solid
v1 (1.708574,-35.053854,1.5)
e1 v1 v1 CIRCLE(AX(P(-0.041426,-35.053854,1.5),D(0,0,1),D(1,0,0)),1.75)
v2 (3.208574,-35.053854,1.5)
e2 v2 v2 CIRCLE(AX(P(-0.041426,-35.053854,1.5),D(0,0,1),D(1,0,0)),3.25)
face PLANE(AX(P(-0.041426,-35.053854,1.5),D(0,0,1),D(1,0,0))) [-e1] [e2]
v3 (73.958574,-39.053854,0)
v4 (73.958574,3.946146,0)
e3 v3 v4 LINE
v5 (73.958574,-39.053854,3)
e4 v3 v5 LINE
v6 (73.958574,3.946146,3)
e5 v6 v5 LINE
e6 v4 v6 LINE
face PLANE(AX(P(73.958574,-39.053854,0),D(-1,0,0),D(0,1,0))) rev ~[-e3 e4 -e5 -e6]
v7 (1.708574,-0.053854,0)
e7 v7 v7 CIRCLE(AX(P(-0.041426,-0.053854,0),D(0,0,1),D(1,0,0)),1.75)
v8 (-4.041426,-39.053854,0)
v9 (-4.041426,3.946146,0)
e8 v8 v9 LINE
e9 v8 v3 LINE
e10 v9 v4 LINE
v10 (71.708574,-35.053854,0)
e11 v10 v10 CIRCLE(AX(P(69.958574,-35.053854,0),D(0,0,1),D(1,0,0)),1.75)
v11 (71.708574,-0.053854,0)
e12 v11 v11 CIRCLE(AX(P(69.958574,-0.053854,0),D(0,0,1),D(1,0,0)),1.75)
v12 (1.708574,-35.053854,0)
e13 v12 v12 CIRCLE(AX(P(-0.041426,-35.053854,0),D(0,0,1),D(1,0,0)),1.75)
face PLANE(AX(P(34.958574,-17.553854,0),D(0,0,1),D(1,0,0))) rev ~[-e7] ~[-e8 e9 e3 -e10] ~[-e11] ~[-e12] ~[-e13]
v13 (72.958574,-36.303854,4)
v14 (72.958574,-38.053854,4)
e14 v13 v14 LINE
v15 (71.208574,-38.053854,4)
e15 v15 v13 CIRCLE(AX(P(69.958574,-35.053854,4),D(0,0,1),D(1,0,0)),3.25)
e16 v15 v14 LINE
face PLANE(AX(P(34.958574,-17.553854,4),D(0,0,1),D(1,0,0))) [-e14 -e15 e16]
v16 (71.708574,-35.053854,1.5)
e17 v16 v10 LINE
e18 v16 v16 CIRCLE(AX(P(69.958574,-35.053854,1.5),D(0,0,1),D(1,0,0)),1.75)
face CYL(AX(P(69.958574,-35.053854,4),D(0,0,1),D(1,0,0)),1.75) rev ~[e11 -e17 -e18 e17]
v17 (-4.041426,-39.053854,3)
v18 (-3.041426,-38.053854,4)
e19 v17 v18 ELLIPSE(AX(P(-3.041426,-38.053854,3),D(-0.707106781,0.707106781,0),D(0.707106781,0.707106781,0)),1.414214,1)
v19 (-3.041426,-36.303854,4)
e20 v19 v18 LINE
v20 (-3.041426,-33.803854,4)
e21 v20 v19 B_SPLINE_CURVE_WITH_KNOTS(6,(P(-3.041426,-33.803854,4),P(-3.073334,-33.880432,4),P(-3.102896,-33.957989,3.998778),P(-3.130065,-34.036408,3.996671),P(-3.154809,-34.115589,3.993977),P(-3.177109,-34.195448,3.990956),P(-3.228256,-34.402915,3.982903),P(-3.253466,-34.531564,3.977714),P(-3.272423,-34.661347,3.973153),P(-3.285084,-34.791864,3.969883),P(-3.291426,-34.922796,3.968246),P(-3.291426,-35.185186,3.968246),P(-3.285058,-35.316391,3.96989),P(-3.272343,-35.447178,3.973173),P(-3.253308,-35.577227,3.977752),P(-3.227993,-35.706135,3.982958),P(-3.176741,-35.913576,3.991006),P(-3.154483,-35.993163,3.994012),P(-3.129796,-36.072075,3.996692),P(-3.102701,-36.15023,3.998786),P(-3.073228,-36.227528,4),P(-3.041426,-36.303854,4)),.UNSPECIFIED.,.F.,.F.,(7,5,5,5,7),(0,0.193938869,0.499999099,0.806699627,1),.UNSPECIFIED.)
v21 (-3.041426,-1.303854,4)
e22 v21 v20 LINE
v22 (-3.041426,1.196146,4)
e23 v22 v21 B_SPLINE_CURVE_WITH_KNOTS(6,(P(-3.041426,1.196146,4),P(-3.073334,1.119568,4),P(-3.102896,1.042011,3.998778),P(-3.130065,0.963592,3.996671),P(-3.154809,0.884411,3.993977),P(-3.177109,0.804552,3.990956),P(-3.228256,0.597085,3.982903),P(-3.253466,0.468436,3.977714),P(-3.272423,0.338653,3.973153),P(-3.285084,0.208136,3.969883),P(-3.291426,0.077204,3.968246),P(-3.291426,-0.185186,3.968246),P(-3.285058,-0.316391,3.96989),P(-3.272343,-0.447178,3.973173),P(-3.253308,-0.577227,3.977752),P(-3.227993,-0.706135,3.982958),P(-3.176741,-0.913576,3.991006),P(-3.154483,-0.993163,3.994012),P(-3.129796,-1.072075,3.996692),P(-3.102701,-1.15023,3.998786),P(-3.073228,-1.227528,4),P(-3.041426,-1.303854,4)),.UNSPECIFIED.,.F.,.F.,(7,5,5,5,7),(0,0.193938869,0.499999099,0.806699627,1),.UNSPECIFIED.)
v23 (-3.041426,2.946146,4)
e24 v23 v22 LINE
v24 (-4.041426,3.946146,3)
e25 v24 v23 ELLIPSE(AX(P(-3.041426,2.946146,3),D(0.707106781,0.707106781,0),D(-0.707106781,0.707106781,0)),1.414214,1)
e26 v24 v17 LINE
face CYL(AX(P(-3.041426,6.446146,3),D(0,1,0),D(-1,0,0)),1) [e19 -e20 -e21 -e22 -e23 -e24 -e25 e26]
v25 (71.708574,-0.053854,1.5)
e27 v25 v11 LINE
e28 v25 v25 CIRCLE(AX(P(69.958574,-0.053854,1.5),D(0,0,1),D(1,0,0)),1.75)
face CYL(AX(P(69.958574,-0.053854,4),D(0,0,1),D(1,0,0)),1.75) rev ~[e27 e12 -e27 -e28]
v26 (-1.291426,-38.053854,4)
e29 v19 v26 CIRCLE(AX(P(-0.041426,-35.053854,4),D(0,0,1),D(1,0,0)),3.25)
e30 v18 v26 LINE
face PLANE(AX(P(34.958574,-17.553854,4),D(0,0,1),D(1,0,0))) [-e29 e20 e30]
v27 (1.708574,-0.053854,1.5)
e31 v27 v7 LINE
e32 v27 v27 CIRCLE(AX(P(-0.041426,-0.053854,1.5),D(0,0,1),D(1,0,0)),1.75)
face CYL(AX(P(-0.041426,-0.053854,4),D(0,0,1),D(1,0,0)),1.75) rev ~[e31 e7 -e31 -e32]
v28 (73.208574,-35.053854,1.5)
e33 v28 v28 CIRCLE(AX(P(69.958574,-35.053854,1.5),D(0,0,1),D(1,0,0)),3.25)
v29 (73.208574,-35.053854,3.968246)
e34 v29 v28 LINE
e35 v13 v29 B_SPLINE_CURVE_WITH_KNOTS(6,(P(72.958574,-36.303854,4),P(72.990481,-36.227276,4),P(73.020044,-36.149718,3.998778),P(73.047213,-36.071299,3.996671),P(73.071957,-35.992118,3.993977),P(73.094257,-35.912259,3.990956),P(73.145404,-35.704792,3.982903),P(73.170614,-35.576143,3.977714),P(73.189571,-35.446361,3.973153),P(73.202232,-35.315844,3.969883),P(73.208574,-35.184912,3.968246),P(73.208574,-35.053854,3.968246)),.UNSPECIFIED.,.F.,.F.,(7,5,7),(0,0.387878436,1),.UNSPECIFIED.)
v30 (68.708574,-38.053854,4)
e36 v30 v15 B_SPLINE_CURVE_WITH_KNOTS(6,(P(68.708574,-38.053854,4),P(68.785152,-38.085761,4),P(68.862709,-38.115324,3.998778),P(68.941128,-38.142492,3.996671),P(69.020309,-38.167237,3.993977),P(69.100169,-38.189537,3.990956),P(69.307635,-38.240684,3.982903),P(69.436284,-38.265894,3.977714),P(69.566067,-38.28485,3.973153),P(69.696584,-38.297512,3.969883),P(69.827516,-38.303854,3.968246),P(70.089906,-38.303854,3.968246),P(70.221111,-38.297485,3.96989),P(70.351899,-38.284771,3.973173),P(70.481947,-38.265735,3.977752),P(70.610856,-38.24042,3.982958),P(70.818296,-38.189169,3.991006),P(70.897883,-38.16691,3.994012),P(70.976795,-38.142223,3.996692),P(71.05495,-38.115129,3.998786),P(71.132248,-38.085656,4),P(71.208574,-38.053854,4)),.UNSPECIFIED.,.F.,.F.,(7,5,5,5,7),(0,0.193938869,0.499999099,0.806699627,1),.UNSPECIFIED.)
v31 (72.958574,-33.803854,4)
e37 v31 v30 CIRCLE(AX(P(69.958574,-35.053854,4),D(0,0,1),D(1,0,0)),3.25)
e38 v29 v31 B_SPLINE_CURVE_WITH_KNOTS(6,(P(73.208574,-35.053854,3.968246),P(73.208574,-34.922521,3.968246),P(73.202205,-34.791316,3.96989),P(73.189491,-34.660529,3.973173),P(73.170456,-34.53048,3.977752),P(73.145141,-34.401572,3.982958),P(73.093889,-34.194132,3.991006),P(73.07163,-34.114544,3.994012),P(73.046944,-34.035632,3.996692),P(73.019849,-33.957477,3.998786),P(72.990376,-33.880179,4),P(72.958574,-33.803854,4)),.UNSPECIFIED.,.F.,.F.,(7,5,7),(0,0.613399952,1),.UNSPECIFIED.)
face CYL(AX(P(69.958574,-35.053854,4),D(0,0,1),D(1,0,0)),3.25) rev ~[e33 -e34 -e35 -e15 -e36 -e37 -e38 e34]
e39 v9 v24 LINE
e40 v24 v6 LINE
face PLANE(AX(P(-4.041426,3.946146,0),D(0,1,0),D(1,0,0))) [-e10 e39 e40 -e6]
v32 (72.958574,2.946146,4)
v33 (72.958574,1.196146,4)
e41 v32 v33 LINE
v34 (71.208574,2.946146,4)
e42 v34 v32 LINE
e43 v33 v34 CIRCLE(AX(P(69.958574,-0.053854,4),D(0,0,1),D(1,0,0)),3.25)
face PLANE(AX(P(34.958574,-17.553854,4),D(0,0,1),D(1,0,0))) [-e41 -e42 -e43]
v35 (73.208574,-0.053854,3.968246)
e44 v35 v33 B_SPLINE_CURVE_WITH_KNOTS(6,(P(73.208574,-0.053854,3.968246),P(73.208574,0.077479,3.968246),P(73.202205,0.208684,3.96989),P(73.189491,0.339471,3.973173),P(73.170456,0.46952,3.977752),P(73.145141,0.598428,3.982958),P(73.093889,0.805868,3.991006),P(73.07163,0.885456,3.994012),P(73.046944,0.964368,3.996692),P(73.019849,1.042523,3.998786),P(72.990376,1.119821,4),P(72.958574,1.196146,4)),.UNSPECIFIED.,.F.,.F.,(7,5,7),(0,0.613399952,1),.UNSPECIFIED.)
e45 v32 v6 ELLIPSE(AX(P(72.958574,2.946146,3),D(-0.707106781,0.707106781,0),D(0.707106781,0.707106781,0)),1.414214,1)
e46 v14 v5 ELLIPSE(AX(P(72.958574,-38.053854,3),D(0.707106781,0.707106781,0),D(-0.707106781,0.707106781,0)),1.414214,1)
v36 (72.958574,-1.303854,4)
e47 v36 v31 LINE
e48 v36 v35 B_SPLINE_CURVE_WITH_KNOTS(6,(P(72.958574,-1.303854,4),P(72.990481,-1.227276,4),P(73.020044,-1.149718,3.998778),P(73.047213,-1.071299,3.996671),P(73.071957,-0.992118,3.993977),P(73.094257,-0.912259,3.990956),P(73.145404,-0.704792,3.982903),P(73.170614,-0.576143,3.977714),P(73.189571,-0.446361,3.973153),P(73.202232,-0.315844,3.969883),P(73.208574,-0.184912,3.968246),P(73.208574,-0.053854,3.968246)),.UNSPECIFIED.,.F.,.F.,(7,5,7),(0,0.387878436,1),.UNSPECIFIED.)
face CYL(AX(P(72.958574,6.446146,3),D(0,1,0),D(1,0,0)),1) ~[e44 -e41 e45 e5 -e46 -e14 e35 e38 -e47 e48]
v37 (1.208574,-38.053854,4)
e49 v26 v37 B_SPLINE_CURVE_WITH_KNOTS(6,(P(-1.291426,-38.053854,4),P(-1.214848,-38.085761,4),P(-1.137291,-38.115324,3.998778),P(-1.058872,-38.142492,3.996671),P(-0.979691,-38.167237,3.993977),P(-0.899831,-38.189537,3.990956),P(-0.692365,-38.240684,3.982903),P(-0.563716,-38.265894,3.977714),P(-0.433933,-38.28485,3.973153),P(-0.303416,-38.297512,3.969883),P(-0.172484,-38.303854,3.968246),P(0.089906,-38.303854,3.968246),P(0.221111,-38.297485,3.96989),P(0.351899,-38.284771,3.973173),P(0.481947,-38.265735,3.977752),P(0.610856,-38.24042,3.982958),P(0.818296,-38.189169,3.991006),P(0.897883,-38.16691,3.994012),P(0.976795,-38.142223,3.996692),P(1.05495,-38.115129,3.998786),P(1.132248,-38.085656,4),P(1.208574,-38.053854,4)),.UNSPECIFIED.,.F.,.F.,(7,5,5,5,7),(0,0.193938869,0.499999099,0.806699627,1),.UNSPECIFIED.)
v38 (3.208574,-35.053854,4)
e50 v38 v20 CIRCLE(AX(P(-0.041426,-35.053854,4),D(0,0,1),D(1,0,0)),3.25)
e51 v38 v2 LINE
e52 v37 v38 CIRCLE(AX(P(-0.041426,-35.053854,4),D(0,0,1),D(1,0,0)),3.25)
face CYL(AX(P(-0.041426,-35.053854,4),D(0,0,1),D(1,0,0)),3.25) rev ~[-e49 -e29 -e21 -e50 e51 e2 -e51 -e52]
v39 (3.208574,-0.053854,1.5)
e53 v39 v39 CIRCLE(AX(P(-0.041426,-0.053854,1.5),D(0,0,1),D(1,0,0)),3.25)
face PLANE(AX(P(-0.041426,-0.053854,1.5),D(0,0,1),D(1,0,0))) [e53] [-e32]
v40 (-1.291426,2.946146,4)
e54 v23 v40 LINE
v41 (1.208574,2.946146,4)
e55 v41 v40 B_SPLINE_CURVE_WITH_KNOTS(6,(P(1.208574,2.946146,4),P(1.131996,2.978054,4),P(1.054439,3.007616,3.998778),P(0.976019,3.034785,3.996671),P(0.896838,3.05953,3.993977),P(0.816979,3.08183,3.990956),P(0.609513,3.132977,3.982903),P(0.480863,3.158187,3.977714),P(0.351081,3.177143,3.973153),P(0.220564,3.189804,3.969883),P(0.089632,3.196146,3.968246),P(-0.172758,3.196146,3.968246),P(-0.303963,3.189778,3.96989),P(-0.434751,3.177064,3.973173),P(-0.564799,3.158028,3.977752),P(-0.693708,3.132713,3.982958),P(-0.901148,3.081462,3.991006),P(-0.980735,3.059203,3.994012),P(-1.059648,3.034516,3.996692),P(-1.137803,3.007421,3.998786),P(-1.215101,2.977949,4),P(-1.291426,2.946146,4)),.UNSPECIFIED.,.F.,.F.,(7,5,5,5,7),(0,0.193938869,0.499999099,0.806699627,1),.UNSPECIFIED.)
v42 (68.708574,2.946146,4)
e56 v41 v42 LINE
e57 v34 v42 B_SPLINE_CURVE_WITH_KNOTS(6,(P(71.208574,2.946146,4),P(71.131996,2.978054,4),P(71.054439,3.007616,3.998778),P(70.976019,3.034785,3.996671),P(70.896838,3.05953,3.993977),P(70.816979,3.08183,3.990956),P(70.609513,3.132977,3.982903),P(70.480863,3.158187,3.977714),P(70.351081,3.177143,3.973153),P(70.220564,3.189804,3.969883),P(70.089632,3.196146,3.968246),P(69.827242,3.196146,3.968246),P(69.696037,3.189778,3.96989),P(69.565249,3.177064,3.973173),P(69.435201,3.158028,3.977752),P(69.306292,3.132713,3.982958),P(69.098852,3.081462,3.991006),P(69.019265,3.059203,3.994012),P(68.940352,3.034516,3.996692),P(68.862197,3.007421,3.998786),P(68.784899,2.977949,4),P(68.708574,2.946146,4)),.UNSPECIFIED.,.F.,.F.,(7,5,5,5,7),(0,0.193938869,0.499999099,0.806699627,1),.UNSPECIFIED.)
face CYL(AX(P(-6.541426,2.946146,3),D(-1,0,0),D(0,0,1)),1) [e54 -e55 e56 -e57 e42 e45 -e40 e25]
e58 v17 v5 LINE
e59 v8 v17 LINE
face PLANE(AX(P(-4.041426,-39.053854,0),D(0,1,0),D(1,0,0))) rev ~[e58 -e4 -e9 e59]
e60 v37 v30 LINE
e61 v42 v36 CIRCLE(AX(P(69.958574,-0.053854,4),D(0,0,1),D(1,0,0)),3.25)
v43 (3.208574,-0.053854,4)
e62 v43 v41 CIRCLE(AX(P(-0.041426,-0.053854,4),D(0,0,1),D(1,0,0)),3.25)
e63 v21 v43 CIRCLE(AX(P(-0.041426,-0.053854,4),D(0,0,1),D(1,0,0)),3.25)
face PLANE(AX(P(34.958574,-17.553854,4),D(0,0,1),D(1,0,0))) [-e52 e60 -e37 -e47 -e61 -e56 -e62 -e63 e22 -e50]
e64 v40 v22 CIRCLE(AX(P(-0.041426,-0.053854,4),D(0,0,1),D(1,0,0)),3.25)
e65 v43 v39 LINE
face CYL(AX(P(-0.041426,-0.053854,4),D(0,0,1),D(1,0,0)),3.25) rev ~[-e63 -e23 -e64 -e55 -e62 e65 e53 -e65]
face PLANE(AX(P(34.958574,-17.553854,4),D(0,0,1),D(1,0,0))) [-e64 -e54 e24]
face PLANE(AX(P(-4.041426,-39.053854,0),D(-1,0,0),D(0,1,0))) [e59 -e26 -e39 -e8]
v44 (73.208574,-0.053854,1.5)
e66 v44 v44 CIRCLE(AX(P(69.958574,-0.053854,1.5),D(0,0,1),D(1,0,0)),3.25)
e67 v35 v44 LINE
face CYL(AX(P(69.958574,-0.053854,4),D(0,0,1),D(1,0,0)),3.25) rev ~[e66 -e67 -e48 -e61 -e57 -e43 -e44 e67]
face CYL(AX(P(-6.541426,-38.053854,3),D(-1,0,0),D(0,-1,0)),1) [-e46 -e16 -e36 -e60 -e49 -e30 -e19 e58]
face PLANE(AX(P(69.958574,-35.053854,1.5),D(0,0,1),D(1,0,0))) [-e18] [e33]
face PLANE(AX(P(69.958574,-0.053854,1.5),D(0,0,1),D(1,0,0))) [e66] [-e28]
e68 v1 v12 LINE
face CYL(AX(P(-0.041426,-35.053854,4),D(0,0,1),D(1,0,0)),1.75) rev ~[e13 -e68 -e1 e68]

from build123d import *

# Parameters (mm, degrees)
F0_W        = 78
F0_H        = 43
F1_DEPTH    = 4
F2_R        = 1.75
F3_DEPTH    = 4.001
F4_R        = 3.25
F5_DEPTH    = 2.5
F6_T1_DEPTH = 48
F6_T3_DEPTH = 83


# Not quite as in the source:
# - a fillet or chamfer that OpenCascade refuses, or shapes differently, is made with other operations: its cross-section is extruded or revolved along the edge and cut away or added


with BuildPart() as f1:
    # F0 (on Top) → F1 (new body)
    with BuildSketch(Plane.XY):
        with Locations((34.9585738778, -17.5538536012)):
            Rectangle(F0_W, F0_H)
    extrude(amount=F1_DEPTH)

    # F2 (on face) → F3 (cut, through all)
    with BuildSketch(Plane.XY.offset(4)):
        with Locations((-0.0414261222, -0.0538536012)):
            Circle(F2_R)
        with Locations((69.9585738778, -0.0538536012)):
            Circle(F2_R)
        with Locations((69.9585738778, -35.0538536012)):
            Circle(F2_R)
        with Locations((-0.0414261222, -35.0538536012)):
            Circle(F2_R)
    extrude(amount=-F3_DEPTH, mode=Mode.SUBTRACT)

    # F4 (on face) → F5 (cut)
    with BuildSketch(Plane.XY.offset(4)):
        with Locations((-0.0414261222, -0.0538536012)):
            Circle(F4_R)
        with Locations((69.9585738778, -0.0538536012)):
            Circle(F4_R)
        with Locations((69.9585738778, -35.0538536012)):
            Circle(F4_R)
        with Locations((-0.0414261222, -35.0538536012)):
            Circle(F4_R)
    extrude(amount=-F5_DEPTH, mode=Mode.SUBTRACT)

    # F6: fillet of radius 1 on 4 edges, made by hand

    # F6_s2 → F6_t1 (cut)
    with BuildSketch(Plane.XZ.offset(-6.4461463988)):
        with BuildLine():
            ThreePointArc((-4.0414261222, 3), (-3.7485329034, 3.7071067812), (-3.0414261222, 4))
            Line((-3.0414261222, 4), (-4.0414261222, 4))
            Line((-4.0414261222, 4), (-4.0414261222, 3))
        make_face()
        with BuildLine():
            ThreePointArc((73.9585738778, 3), (73.665680659, 3.7071067812), (72.9585738778, 4))
            Line((72.9585738778, 4), (73.9585738778, 4))
            Line((73.9585738778, 4), (73.9585738778, 3))
        make_face()
    extrude(amount=F6_T1_DEPTH, mode=Mode.SUBTRACT)

    # F6_s4 → F6_t3 (cut)
    with BuildSketch(Plane.YZ.offset(-6.5414261222)):
        with BuildLine():
            ThreePointArc((-39.0538536012, 3), (-38.7609603824, 3.7071067812), (-38.0538536012, 4))
            Line((-38.0538536012, 4), (-39.0538536012, 4))
            Line((-39.0538536012, 4), (-39.0538536012, 3))
        make_face()
        with BuildLine():
            ThreePointArc((2.9461463988, 4), (3.65325318, 3.7071067812), (3.9461463988, 3))
            Line((3.9461463988, 3), (3.9461463988, 4))
            Line((3.9461463988, 4), (2.9461463988, 4))
        make_face()
    extrude(amount=F6_T3_DEPTH, mode=Mode.SUBTRACT)


solid = f1.part
